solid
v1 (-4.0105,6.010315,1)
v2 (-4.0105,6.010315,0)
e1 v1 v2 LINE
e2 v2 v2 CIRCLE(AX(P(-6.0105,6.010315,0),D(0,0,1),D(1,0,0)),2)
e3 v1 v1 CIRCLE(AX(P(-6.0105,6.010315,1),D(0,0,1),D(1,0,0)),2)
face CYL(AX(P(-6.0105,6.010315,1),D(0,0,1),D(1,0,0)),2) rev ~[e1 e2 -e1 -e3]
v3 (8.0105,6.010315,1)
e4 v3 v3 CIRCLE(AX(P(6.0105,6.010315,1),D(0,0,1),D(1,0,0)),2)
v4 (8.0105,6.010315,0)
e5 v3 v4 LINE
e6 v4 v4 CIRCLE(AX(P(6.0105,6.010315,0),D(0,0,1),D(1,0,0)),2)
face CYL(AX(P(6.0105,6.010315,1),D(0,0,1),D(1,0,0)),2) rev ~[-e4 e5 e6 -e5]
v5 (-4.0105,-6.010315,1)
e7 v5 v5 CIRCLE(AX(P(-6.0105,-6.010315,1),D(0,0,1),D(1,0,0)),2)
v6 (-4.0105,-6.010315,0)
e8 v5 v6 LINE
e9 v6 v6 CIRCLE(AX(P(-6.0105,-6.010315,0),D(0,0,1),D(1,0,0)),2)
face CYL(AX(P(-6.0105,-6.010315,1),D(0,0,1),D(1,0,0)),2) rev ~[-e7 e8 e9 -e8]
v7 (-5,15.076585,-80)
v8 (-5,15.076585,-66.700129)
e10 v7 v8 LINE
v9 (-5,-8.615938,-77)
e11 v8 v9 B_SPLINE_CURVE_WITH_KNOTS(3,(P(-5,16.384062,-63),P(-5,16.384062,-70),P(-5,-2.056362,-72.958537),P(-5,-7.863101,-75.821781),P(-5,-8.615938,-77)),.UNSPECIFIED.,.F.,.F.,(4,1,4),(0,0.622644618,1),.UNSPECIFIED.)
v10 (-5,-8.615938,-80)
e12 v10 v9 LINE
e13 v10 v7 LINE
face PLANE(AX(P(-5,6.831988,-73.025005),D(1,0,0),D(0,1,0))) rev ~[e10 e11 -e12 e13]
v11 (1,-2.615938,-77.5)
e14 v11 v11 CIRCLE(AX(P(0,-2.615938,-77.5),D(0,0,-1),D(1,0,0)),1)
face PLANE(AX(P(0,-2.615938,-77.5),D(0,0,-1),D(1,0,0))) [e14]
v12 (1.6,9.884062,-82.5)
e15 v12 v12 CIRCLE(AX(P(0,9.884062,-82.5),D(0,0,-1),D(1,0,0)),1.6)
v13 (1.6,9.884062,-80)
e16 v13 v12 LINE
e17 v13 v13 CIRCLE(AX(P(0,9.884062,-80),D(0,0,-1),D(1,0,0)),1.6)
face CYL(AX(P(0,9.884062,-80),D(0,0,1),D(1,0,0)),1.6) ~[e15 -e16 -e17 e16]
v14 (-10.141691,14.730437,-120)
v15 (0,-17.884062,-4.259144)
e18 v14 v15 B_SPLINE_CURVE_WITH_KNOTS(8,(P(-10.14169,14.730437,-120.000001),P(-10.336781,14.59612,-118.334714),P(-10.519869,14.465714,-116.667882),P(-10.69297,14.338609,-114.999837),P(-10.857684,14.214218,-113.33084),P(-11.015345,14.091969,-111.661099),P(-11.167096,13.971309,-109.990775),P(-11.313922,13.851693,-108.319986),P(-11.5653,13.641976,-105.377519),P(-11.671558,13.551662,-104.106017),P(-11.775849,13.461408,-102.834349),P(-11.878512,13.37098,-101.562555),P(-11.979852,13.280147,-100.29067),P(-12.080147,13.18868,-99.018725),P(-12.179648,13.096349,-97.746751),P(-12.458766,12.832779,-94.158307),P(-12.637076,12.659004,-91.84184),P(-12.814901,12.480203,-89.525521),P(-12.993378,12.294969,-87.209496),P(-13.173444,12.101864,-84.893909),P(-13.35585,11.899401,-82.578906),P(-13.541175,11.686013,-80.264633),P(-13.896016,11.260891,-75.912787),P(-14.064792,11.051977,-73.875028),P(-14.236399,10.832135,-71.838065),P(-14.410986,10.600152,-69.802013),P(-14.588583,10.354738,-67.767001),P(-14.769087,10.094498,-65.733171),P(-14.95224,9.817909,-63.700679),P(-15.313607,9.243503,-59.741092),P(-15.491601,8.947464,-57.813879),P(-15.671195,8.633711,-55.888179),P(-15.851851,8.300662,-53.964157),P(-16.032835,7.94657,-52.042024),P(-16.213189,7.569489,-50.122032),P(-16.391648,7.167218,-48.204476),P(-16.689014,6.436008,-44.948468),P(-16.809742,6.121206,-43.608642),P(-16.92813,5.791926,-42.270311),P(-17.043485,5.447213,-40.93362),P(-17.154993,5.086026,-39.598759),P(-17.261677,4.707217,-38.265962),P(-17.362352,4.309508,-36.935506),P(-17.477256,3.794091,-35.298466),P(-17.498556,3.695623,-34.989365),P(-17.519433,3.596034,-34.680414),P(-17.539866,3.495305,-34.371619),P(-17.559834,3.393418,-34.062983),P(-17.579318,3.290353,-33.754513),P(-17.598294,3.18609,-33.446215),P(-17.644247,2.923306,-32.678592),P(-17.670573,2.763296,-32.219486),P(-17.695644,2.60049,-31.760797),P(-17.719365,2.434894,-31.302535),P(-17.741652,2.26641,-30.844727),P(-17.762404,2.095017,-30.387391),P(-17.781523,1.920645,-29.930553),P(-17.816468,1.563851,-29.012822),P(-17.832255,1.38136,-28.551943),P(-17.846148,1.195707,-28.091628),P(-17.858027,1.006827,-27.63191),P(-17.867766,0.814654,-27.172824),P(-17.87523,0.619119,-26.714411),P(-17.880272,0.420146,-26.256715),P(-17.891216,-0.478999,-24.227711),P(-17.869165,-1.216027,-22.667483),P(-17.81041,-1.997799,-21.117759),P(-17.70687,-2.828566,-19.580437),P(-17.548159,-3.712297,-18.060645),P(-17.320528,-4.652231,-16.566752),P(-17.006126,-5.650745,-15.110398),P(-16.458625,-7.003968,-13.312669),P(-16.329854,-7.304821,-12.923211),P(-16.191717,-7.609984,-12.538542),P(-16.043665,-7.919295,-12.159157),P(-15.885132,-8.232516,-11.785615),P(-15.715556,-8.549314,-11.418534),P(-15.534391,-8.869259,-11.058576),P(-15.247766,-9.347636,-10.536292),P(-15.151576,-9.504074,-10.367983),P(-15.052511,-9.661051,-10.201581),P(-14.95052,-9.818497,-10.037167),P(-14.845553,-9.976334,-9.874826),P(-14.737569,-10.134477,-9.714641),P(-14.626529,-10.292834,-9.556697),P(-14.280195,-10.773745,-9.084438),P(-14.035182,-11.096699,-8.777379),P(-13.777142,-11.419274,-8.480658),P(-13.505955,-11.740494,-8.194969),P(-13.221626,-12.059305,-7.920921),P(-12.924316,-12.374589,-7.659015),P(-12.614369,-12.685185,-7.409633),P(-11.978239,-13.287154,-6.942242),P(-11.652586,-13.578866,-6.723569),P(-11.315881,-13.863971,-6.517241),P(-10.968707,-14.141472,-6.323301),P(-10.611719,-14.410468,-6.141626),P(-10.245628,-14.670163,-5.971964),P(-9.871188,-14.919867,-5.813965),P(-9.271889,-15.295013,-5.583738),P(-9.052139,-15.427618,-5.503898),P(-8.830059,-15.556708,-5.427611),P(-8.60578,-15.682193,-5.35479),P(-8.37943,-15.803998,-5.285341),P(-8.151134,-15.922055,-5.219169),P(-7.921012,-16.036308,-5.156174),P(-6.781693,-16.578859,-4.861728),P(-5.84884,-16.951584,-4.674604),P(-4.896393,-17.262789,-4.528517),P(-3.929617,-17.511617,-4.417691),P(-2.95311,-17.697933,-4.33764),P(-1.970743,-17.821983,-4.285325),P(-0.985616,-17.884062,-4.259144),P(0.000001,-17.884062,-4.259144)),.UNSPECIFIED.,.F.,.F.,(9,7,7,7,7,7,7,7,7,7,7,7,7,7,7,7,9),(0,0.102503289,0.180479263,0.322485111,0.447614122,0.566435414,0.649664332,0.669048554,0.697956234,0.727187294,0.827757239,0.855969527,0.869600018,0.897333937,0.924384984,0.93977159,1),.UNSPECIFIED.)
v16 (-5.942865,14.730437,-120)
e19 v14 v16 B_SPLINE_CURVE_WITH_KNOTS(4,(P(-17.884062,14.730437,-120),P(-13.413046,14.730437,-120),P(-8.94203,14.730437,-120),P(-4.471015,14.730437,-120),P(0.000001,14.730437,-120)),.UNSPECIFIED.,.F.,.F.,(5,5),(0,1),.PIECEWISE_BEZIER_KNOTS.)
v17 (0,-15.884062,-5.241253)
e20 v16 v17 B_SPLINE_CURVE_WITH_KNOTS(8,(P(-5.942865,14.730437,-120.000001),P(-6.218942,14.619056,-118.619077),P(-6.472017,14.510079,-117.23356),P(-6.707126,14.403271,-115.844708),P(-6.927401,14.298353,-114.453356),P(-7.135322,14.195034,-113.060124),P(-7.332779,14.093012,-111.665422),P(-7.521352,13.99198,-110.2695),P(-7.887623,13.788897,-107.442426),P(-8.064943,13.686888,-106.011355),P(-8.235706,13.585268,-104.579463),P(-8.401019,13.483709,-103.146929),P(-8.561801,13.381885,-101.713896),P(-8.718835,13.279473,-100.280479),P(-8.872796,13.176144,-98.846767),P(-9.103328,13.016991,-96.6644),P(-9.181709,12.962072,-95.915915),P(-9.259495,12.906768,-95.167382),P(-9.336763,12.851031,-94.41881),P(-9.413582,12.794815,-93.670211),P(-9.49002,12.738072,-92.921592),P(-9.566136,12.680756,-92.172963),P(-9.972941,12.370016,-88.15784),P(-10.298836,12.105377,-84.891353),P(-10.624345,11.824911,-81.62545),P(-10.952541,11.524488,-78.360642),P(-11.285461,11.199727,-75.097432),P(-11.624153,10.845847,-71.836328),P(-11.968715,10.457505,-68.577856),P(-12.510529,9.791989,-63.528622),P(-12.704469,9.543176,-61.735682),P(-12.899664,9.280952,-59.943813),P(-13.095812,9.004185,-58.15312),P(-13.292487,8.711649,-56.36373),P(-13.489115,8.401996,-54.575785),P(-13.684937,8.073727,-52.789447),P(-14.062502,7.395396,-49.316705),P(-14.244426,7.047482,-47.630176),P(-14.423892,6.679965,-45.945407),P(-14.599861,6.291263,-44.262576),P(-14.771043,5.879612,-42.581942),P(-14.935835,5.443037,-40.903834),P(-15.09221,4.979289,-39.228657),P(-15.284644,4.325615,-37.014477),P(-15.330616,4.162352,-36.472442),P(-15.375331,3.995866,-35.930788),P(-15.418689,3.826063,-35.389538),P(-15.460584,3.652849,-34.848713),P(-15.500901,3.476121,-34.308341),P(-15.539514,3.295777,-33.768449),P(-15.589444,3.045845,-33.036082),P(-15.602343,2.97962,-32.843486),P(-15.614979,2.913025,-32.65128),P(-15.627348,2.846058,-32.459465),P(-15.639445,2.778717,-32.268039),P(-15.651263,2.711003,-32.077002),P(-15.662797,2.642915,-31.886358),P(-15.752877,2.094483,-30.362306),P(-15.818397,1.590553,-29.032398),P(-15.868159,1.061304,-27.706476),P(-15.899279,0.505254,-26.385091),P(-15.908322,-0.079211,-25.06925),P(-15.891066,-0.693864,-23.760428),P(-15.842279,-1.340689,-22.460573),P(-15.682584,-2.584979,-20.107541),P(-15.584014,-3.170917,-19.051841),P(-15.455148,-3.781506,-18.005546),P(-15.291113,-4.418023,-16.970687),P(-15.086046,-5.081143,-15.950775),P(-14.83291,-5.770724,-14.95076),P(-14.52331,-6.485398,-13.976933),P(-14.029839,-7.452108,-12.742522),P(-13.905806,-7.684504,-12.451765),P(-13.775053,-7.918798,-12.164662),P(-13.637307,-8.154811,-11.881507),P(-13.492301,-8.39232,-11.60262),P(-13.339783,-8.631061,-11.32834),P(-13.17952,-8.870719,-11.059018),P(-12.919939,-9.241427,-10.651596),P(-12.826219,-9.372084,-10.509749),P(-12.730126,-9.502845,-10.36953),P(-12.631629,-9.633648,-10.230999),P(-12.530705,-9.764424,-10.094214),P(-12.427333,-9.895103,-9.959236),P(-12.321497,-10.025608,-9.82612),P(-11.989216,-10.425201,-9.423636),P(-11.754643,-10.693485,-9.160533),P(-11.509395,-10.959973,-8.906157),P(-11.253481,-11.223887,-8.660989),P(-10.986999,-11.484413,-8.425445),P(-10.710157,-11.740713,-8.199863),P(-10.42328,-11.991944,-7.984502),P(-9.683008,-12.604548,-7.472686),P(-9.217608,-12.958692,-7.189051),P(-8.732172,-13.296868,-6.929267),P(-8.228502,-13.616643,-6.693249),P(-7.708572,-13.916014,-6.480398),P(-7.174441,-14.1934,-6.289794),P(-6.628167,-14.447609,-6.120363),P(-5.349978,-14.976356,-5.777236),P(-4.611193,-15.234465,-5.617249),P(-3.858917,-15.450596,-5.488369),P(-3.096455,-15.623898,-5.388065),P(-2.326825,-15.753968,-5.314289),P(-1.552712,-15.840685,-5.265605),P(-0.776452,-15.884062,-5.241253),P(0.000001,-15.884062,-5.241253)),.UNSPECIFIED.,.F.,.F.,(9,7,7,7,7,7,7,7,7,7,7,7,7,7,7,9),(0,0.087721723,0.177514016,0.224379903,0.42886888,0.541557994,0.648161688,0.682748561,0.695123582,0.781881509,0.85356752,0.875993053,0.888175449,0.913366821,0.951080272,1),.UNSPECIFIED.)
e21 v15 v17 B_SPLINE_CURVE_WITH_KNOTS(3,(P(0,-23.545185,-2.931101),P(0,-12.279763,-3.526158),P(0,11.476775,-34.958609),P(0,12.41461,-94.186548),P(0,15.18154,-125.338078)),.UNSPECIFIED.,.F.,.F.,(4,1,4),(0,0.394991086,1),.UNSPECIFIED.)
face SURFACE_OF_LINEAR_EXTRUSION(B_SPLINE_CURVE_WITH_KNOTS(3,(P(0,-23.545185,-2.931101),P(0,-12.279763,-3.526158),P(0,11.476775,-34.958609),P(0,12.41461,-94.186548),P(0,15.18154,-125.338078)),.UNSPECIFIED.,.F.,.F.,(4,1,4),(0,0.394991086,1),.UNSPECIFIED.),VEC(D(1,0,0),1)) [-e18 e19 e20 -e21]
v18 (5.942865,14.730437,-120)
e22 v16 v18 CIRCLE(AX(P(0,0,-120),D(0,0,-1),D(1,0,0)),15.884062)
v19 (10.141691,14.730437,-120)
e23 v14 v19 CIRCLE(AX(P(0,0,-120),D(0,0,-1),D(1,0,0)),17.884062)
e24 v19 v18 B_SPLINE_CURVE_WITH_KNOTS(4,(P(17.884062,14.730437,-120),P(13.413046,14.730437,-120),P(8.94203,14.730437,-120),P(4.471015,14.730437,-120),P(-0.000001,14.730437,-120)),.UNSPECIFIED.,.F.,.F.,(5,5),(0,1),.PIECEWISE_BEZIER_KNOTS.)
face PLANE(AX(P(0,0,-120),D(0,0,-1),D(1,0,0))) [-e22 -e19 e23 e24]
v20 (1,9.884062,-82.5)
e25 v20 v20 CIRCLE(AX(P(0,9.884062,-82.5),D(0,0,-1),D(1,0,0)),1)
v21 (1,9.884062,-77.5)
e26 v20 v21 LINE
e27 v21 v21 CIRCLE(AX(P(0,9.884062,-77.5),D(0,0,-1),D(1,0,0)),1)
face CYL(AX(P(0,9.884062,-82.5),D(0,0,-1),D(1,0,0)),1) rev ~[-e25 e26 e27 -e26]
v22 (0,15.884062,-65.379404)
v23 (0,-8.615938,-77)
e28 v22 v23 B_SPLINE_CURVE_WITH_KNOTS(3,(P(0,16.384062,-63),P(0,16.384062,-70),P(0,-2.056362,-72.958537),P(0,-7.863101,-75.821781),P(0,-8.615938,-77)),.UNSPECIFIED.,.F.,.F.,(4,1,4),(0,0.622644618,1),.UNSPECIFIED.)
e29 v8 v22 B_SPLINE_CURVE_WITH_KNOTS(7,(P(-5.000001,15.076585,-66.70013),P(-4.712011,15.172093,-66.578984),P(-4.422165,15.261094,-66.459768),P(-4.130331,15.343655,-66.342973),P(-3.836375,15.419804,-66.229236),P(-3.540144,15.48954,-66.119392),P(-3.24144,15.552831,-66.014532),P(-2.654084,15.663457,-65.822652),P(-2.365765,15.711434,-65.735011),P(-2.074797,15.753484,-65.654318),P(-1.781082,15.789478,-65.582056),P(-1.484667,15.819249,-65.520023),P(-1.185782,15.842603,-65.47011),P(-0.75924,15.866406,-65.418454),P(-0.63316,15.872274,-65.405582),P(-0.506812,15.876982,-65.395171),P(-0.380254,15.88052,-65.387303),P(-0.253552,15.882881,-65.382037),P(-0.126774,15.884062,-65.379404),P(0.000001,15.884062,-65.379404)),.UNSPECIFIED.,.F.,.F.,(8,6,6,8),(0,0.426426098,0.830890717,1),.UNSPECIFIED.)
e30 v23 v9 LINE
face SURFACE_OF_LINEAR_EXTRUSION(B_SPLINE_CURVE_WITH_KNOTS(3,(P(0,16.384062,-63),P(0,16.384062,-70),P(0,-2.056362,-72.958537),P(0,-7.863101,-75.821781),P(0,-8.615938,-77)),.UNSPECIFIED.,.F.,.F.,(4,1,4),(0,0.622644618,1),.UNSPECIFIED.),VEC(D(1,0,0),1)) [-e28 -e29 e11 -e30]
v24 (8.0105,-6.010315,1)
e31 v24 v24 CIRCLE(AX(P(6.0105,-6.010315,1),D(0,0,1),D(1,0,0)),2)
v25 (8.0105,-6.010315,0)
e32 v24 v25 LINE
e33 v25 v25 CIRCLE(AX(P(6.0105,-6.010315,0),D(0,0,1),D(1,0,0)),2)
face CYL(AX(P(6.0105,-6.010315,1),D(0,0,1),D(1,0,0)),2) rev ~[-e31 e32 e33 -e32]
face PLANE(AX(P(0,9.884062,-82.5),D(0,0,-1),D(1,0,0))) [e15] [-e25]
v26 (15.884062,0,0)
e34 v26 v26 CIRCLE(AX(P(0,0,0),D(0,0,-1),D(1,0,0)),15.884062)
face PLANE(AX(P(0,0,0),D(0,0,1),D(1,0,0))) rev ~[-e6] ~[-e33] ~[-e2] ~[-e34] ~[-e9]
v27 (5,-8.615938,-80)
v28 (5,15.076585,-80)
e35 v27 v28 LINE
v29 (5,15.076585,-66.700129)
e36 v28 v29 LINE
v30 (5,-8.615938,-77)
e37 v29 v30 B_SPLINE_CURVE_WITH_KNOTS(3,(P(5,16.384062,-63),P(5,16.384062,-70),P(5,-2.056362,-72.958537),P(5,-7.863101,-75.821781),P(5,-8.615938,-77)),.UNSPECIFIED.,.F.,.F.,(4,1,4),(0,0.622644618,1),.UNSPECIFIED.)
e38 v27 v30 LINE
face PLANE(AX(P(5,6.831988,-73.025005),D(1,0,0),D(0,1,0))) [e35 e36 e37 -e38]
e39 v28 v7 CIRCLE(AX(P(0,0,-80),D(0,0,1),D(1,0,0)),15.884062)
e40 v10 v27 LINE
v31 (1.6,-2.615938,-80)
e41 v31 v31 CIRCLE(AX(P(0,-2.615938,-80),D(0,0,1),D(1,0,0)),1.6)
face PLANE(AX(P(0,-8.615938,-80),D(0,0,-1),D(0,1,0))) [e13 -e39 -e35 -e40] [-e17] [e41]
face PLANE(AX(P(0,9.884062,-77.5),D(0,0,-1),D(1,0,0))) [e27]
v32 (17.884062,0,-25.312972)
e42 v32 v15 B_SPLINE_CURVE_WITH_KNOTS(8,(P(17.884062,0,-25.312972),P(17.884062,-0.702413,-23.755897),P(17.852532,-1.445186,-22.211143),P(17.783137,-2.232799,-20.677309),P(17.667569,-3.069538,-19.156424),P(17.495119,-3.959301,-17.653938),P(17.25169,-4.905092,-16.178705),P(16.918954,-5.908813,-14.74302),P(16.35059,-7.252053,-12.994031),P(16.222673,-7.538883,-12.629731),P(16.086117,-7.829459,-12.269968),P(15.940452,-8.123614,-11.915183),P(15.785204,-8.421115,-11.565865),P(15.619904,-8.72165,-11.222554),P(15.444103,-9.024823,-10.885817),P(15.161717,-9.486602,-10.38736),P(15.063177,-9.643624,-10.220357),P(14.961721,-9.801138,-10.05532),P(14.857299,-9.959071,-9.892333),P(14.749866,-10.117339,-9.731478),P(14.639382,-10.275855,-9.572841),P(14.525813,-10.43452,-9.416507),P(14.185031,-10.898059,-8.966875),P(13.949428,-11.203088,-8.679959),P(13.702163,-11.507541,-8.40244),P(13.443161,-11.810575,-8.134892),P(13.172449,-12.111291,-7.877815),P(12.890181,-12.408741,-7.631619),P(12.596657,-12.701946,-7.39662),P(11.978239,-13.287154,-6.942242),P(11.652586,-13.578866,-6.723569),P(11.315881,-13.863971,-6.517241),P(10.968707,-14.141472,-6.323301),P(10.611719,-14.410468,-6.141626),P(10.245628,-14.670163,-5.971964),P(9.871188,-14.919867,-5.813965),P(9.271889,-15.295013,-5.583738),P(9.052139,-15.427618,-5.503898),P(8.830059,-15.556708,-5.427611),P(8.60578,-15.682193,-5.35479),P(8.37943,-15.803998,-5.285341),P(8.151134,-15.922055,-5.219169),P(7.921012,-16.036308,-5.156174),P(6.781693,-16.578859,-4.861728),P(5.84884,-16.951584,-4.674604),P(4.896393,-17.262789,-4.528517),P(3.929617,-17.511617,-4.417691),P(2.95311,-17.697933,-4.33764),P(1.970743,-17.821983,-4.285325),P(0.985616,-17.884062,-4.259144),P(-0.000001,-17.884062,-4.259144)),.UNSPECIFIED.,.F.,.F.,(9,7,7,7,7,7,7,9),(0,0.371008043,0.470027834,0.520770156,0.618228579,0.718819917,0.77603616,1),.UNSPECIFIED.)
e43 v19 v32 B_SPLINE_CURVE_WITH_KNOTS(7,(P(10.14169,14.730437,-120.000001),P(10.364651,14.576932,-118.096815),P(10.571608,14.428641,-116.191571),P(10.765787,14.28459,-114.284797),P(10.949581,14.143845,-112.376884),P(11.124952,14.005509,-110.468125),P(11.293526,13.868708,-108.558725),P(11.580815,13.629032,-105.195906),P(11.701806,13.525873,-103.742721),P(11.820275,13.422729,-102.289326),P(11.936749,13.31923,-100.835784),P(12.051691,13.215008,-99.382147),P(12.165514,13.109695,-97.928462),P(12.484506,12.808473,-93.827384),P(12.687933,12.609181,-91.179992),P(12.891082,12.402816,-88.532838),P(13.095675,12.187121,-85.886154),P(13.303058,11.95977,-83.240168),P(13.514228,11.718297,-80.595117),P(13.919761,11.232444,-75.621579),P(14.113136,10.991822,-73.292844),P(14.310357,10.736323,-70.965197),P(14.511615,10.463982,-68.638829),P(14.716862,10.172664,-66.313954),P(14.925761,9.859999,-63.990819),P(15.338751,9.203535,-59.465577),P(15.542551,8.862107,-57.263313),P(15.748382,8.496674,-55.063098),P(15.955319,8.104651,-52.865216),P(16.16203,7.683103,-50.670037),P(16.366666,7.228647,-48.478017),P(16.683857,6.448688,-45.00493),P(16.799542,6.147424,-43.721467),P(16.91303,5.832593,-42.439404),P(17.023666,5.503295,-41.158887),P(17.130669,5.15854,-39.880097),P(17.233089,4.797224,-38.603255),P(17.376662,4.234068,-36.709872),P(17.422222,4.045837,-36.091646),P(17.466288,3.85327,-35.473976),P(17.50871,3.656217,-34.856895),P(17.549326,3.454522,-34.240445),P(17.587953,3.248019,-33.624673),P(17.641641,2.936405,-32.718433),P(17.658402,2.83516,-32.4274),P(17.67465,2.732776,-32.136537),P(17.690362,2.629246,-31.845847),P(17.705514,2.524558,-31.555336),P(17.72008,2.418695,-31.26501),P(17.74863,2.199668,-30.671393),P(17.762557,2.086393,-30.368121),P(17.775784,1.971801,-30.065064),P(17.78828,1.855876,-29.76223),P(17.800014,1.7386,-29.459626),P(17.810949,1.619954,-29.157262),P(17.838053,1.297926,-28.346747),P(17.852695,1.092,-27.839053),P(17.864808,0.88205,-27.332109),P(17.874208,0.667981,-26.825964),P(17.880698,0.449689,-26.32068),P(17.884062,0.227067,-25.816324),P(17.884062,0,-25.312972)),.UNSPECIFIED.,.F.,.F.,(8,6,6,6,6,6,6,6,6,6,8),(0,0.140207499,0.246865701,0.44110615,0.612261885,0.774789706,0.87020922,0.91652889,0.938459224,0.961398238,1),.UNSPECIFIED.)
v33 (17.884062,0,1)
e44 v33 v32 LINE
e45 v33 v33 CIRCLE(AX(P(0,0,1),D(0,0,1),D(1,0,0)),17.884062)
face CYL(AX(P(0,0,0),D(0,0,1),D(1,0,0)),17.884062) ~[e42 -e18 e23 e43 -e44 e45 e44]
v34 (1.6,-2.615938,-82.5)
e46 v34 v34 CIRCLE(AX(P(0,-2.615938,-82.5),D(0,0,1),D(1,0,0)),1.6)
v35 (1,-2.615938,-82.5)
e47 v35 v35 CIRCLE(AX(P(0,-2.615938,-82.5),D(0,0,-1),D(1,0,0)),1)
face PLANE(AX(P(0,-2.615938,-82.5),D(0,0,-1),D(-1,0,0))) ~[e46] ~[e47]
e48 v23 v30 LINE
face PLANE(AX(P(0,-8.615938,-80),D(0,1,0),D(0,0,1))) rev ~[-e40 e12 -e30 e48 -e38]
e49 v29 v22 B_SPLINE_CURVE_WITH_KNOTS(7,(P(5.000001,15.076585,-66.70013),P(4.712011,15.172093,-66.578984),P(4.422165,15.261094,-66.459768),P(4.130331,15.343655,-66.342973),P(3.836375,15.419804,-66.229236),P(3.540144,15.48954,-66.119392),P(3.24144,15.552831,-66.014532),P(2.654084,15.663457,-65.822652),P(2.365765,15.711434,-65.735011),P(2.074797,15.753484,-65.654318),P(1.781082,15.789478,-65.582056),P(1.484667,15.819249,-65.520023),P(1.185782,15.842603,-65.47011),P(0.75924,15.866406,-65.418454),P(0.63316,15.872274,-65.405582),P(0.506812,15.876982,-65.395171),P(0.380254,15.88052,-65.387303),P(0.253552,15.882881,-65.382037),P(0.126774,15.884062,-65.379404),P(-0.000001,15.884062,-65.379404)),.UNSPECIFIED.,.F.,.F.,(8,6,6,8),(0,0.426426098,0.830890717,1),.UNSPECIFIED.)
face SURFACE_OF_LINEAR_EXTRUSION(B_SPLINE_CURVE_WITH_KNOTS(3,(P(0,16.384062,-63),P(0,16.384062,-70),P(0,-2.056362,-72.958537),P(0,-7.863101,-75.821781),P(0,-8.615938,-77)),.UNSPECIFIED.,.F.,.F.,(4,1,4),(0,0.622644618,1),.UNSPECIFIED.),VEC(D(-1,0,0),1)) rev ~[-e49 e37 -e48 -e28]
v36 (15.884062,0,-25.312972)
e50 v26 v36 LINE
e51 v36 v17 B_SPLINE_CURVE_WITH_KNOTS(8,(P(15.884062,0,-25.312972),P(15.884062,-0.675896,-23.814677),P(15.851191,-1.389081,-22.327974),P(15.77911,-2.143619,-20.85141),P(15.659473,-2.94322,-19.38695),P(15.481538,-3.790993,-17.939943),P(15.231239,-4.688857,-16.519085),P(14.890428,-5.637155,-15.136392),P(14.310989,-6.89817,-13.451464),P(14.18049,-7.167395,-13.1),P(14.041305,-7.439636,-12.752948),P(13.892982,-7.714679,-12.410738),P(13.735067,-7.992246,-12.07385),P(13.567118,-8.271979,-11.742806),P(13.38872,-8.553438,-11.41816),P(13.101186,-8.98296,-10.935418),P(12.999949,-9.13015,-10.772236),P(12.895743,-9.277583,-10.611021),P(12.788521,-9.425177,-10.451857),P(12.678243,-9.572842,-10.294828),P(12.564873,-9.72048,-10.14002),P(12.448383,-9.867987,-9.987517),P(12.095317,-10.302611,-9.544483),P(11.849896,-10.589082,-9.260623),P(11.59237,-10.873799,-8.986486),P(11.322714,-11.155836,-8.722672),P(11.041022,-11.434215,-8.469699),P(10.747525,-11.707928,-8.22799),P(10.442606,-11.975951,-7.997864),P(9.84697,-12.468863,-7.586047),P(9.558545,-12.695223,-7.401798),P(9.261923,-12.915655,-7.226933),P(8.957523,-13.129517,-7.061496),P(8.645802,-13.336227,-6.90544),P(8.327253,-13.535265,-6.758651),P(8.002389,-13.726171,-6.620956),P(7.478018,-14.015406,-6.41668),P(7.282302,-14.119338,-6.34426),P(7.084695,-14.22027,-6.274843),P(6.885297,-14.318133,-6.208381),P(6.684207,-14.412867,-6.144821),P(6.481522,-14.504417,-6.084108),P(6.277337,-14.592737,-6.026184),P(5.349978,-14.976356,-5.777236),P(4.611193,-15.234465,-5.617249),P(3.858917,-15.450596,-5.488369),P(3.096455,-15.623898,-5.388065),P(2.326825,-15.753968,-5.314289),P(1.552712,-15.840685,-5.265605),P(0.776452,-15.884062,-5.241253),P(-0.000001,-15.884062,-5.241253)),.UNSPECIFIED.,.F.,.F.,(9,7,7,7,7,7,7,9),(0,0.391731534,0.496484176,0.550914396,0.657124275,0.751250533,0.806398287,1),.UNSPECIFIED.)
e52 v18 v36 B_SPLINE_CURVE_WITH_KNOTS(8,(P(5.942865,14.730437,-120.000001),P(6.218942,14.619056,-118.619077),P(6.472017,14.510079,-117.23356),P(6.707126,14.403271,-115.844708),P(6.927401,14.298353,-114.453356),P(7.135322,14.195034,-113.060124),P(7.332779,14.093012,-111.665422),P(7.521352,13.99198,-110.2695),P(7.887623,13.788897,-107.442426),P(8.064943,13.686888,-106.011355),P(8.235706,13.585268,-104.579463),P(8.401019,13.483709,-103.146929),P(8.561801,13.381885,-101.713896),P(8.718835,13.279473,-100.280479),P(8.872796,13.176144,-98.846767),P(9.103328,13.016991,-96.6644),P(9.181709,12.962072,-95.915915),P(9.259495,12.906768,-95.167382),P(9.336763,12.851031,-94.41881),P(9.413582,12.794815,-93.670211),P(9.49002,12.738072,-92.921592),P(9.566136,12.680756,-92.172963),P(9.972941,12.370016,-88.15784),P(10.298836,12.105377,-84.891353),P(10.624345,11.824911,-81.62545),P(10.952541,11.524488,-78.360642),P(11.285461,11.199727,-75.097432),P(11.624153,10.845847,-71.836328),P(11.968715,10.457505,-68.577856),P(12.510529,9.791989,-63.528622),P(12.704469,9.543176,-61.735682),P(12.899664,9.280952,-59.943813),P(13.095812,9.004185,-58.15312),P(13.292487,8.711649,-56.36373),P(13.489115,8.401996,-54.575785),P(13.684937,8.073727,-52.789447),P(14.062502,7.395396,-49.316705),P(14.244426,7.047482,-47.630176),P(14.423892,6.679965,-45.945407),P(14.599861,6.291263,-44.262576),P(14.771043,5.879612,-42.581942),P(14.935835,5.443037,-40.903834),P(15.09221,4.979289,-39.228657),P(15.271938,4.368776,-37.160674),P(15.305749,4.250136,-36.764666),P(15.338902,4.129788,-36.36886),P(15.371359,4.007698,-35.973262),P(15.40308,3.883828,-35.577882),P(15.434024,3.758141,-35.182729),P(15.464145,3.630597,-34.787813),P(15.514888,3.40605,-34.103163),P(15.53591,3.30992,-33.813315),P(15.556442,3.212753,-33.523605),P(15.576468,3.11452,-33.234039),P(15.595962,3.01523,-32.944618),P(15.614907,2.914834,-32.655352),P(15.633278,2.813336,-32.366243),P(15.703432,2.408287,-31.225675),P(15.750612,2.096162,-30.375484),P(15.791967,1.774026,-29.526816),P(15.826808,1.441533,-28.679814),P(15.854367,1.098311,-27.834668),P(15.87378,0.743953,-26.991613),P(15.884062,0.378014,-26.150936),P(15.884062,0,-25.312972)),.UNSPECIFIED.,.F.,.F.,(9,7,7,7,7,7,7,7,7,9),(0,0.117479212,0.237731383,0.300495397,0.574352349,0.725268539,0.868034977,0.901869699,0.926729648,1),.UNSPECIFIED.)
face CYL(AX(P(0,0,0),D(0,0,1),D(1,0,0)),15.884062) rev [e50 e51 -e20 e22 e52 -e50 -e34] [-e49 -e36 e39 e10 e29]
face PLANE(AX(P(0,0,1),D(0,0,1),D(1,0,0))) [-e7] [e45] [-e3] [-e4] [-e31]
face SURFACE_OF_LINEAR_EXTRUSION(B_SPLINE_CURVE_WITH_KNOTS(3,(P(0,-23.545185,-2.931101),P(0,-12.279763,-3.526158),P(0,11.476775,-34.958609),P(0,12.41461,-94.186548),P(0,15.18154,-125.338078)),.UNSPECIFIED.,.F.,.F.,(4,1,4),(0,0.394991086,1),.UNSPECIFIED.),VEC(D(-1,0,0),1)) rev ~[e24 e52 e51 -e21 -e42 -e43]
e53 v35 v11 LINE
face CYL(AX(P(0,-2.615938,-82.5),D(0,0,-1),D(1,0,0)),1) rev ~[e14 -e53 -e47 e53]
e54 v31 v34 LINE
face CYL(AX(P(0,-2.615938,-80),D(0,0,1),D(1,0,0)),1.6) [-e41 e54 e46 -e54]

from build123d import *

# Parameters (mm, degrees)
F0_R      = 17.884061545
F1_DEPTH  = 1
F2_R      = 17.884061545
F2_R_2    = 15.884061545
F3_DEPTH  = 120
F5_DEPTH  = 100
F6_R      = 2
F7_DEPTH  = 121.0010007
F8_W      = 25
F8_H      = 3
F9_DEPTH  = 5
F10_R     = 1.6
F11_DEPTH = 2.5
F12_R     = 1
F13_DEPTH = 5


# Not quite as in the source:
# - a pattern or mirror of a feature is missing from the dataset's text; its kind, count and spacing are read off the source's solid
# - a feature names something its author has since deleted; it is built from what else it names


with BuildPart() as f1:
    # F0 (on Top) → F1 (new body)
    with BuildSketch(Plane.XY):
        Circle(F0_R)
    extrude(amount=F1_DEPTH)

    # F2 (on face) → F3 (join)
    with BuildSketch(Plane(origin=(0, 0, 0), x_dir=(1, 0, 0), z_dir=(0, 0, -1))):
        Circle(F2_R)
        Circle(F2_R_2, mode=Mode.SUBTRACT)
    extrude(amount=F3_DEPTH)

    # F4 (on Right) → F5 (cut, symmetric)
    with BuildSketch(Plane.YZ):
        with BuildLine():
            add(Edge.make_bspline(
                [(-23.545185104, -2.931100782), (-12.2797633222, -3.5261581086), (11.4767752963, -34.9586093489), (12.414609837, -94.1865478451), (15.1815395802, -125.3380775452)],
                knots=[0, 0, 0, 0, 0.3949910862, 1, 1, 1, 1], degree=3))
            Line((-23.545185104, -2.931100782), (-23.545185104, -130.5240243673))
            Line((-23.545185104, -130.5240243673), (15.1815395802, -125.3380775452))
        make_face()
    extrude(amount=F5_DEPTH, both=True, mode=Mode.SUBTRACT)

    # F6 (on face) → F7 (cut, through all)
    with BuildSketch(Plane.XY.offset(1)):
        with Locations((-6.0105, 6.0103152788)):
            Circle(F6_R)
        with Locations((6.0105, 6.0103152788)):
            Circle(F6_R)
        with Locations((6.0105, -6.0103152788)):
            Circle(F6_R)
        with Locations((-6.0105, -6.0103152788)):
            Circle(F6_R)
    extrude(amount=-F7_DEPTH, mode=Mode.SUBTRACT)

    # F8 (on Right) → F9 (join, symmetric)
    with BuildSketch(Plane.YZ):
        with BuildLine():
            Line((16.384061545, -77), (16.384061545, -63))
            add(Edge.make_bspline(
                [(16.384061545, -63), (16.384061545, -70), (-2.0563617415, -72.958536621), (-7.8631014511, -75.8217814094), (-8.615938455, -77)],
                knots=[0, 0, 0, 0, 0.622644618, 1, 1, 1, 1], degree=3))
            Line((-8.615938455, -77), (16.384061545, -77))
        make_face()
        with Locations((3.884061545, -78.5)):
            Rectangle(F8_W, F8_H)
    extrude(amount=F9_DEPTH, both=True)

    # F10 (on face) → F11 (join)
    with BuildSketch(Plane(origin=(0, 0, -80), x_dir=(1, 0, 0), z_dir=(0, 0, -1))):
        with Locations((0, -9.884061545)):
            Circle(F10_R)
    f11 = extrude(amount=F11_DEPTH)

    # F11_copies: F11 across plane
    add(f11.mirror(Plane(origin=(0, 3.634062, 0), x_dir=(0, 0, -1), z_dir=(0, -1, 0))))

    # F12 (on face) → F13 (cut)
    with BuildSketch(Plane(origin=(0, 0, -82.5), x_dir=(1, 0, 0), z_dir=(0, 0, -1))):
        with Locations((0, 2.615938455)):
            Circle(F12_R)
        with Locations((0, -9.884061545)):
            Circle(F12_R)
    extrude(amount=-F13_DEPTH, mode=Mode.SUBTRACT)


solid = f1.part
